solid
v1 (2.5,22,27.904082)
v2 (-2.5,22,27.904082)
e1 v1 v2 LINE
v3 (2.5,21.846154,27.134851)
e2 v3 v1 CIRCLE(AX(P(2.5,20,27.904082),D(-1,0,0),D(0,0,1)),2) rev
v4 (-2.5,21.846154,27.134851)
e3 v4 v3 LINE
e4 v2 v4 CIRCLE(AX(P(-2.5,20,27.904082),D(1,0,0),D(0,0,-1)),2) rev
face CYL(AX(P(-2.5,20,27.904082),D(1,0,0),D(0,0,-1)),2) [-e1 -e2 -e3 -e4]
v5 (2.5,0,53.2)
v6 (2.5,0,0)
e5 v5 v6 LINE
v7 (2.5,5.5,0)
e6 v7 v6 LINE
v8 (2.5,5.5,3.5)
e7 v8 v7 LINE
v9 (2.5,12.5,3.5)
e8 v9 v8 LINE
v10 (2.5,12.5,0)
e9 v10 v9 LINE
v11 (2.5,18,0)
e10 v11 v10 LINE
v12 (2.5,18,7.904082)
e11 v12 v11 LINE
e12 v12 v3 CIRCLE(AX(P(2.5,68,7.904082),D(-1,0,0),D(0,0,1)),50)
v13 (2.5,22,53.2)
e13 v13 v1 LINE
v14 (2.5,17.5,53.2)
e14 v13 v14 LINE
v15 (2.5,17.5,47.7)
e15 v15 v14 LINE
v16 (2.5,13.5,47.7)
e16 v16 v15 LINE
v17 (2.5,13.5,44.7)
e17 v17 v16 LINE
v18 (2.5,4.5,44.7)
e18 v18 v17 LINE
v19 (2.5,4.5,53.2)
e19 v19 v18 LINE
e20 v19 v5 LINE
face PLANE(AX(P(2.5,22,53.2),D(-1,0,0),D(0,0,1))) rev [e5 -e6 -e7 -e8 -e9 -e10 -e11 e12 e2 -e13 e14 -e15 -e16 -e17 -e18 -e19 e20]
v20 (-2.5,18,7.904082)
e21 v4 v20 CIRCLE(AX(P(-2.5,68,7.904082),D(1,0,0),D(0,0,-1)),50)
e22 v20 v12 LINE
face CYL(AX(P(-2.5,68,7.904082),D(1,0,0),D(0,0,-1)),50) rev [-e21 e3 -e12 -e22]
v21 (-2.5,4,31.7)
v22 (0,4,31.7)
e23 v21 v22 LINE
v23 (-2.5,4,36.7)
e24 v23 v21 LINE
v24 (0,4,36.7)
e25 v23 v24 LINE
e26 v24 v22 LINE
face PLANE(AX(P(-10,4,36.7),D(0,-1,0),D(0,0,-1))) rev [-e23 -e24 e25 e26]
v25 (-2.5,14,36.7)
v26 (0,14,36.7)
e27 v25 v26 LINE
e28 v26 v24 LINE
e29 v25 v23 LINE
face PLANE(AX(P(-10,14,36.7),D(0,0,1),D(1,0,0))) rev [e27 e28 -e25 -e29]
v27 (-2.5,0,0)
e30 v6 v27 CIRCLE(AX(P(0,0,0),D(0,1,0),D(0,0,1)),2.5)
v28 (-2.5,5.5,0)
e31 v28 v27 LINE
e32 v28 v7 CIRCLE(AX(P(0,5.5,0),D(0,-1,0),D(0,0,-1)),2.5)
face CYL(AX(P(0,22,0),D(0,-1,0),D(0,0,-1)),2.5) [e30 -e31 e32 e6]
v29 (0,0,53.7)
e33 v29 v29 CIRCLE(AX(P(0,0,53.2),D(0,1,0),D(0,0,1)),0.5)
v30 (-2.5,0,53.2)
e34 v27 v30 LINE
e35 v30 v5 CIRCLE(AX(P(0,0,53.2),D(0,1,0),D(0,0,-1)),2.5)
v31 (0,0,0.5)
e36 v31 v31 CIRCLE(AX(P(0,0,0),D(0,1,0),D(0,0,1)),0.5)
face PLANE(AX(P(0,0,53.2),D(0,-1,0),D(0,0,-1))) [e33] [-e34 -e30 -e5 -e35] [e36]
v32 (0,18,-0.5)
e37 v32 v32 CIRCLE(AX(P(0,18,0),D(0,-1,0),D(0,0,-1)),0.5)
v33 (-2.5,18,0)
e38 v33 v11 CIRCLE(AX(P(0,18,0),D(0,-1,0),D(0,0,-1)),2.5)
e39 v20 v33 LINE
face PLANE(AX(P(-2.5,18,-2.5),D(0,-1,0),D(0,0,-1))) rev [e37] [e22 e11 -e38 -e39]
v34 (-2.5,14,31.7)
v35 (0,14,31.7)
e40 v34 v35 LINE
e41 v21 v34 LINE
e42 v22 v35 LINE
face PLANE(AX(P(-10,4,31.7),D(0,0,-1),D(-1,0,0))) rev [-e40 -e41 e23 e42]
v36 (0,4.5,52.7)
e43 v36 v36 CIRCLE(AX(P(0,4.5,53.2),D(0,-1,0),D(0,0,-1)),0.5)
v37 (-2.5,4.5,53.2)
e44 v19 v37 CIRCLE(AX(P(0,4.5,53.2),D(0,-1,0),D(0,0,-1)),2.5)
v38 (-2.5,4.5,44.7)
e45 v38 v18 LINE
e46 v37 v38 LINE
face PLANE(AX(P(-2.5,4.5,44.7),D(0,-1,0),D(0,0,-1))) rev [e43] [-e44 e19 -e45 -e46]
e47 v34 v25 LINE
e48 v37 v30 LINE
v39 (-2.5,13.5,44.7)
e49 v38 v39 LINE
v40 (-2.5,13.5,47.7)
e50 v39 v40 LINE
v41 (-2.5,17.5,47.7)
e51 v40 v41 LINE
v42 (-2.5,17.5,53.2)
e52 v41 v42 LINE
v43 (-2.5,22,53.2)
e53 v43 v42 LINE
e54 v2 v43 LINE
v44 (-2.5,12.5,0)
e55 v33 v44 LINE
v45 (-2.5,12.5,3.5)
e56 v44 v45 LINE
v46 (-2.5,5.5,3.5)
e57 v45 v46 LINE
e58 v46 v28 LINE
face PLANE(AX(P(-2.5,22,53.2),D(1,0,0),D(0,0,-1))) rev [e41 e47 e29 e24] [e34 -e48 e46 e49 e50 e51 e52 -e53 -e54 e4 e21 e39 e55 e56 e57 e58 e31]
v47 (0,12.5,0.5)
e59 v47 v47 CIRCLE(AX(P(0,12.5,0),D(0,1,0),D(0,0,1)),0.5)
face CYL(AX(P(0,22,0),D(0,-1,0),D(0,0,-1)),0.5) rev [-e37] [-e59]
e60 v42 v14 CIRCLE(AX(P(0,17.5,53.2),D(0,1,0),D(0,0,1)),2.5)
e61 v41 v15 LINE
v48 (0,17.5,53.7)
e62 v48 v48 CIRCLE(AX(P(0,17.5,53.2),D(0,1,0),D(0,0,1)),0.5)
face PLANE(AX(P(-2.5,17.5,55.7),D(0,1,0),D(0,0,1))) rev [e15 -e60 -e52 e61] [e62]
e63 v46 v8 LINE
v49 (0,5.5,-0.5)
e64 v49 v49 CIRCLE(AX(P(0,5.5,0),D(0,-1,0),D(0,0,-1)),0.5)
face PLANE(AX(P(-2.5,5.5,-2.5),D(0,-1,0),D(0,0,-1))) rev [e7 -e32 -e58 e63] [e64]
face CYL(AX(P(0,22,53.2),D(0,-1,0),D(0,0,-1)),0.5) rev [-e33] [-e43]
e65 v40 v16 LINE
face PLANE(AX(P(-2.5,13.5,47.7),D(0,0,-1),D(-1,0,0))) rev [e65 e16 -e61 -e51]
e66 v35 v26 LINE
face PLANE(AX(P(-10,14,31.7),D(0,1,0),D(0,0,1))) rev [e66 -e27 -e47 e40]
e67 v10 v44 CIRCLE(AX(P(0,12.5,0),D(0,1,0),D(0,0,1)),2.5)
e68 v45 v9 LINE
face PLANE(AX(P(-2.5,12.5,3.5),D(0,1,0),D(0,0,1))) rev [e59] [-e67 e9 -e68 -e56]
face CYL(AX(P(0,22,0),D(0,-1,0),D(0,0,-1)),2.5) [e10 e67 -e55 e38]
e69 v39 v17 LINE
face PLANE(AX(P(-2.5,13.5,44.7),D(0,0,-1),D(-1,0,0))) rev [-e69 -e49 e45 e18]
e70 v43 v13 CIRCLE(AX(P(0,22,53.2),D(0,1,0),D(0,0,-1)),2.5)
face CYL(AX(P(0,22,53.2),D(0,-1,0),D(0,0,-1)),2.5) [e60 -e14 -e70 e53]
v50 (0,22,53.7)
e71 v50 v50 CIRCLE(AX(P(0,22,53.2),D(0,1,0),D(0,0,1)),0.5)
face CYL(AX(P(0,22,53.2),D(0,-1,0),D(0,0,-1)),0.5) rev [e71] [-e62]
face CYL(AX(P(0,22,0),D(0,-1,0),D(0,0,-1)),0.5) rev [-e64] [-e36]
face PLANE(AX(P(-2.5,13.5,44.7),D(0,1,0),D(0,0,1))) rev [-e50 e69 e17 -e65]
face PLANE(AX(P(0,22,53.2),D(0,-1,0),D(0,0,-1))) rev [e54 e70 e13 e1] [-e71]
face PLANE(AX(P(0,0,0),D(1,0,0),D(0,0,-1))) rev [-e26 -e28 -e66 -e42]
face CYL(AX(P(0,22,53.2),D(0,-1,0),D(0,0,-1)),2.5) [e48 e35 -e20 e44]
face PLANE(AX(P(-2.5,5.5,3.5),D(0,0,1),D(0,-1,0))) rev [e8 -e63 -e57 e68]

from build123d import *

# Parameters (mm, degrees)
SKETCHSIDE_R                    = 0.5
BOSSEXTRUDESIDE_DEPTH           = 22
CUTEXTRUDEDISTALROOM_DEPTH      = 60.939469467
CUTEXTRUDEDISTALROOM_DEPTH_BACK = 60.939469467
SKETCHSESORROOM_W               = 5
SKETCHSESORROOM_H               = 10
CUTEXTRUDESENSORROOM_DEPTH      = 10
CUTEXTRUDESTRONGSIDE_DEPTH      = 60.939469467
CUTEXTRUDESTRONGSIDE_DEPTH_BACK = 60.939469467
SKETCHSTRONGSIDE_W              = 30
SKETCHSTRONGSIDE_H              = 4
FILLETSTRONGSIDE_R              = 50
FILLETSIDE_R                    = 2
CUTEXTRUDESPRINGROOM_DEPTH      = 60.939469467
CUTEXTRUDESPRINGROOM_DEPTH_BACK = 60.939469467
SKETCHSPRINGROOM_W              = 6
SKETCHSPRINGROOM_H              = 7


with BuildPart() as part:
    # SketchSide → BossExtrudeSide (new body)
    with BuildSketch(Plane(origin=(0, 0, 0), x_dir=(1, 0, 0), z_dir=(0, 1, 0))):
        with BuildLine():
            Line((-2.5, -24.778081045), (-2.5, 0))
            ThreePointArc((-2.5, 0), (0, 2.5), (2.5, 0))
            Line((2.5, 0), (2.5, -53.2))
            ThreePointArc((2.5, -53.2), (0, -55.7), (-2.5, -53.2))
            Line((-2.5, -53.2), (-2.5, -24.778081045))
        make_face()
        with Locations(Location((0, 0, 0), (0, 0, 270))):
            Circle(SKETCHSIDE_R, mode=Mode.SUBTRACT)
        with Locations(Location((0, -53.2, 0), (0, 0, 270))):
            Circle(SKETCHSIDE_R, mode=Mode.SUBTRACT)
    extrude(amount=BOSSEXTRUDESIDE_DEPTH)

    # SketchDistalRoom → CutExtrudeDistalRoom (cut, two sides: drawn at the far end of the back side and taken through both)
    with BuildSketch(Plane(origin=(0, 0, 0), x_dir=(0, 0, -1), z_dir=(1, 0, 0)).offset(-CUTEXTRUDEDISTALROOM_DEPTH_BACK)):
        Polygon((-44.7, 13.5), (-47.7, 13.5), (-47.7, 17.5), (-55.7, 17.5), (-55.7, 4.5), (-44.7, 4.5), align=None)
    extrude(amount=CUTEXTRUDEDISTALROOM_DEPTH + CUTEXTRUDEDISTALROOM_DEPTH_BACK, mode=Mode.SUBTRACT)

    # SketchSesorRoom → CutExtrudeSensorRoom (cut)
    with BuildSketch(Plane(origin=(0, 0, 0), x_dir=(0, 0, -1), z_dir=(1, 0, 0))):
        with Locations((-34.2, 9)):
            Rectangle(SKETCHSESORROOM_W, SKETCHSESORROOM_H)
    extrude(amount=-CUTEXTRUDESENSORROOM_DEPTH, mode=Mode.SUBTRACT)

    # SketchStrongSide → CutExtrudeStrongSide (cut, two sides: drawn at the far end of the back side and taken through both)
    with BuildSketch(Plane(origin=(0, 0, 0), x_dir=(0, 0, -1), z_dir=(1, 0, 0)).offset(-CUTEXTRUDESTRONGSIDE_DEPTH_BACK)):
        with Locations((-12.5, 20)):
            Rectangle(SKETCHSTRONGSIDE_W, SKETCHSTRONGSIDE_H)
    extrude(amount=CUTEXTRUDESTRONGSIDE_DEPTH + CUTEXTRUDESTRONGSIDE_DEPTH_BACK, mode=Mode.SUBTRACT)

    # FilletStrongSide
    # the kernel refuses this fillet: 50 mm, written as the material it adds along each edge
    with BuildSketch(Plane(origin=(2.5, 18, 27.5), x_dir=(0, 1, 0), z_dir=(-1, 0, 0))) as filletstrongside_piece_1:
        with BuildLine():
            CenterArc((50, 19.595917942), FILLETSTRONGSIDE_R, 180, 23.073918066)
            Line((0, 19.595917942), (-1, 19.595917942))
            Line((-1, 19.595917942), (-1, 0))
            Line((-1, 0), (0, -1))
            ThreePointArc((0, -1), (2, -1), (3.08, -0.391918359))
            Line((3.08, -0.391918359), (4, 0))
        make_face()
    extrude(amount=5)

    # FilletSide
    filletside_edges = [part.edges().sort_by_distance(p)[0] for p in [
        (0, 22, 27.5),
    ]]
    fillet(filletside_edges, radius=FILLETSIDE_R)

    # SketchSpringRoom → CutExtrudeSpringRoom (cut, two sides: drawn at the far end of the back side and taken through both)
    with BuildSketch(Plane(origin=(0, 0, 0), x_dir=(0, 0, -1), z_dir=(1, 0, 0)).offset(-CUTEXTRUDESPRINGROOM_DEPTH_BACK)):
        with Locations((-0.5, 9)):
            Rectangle(SKETCHSPRINGROOM_W, SKETCHSPRINGROOM_H)
    extrude(amount=CUTEXTRUDESPRINGROOM_DEPTH + CUTEXTRUDESPRINGROOM_DEPTH_BACK, mode=Mode.SUBTRACT)


solid = part.part
